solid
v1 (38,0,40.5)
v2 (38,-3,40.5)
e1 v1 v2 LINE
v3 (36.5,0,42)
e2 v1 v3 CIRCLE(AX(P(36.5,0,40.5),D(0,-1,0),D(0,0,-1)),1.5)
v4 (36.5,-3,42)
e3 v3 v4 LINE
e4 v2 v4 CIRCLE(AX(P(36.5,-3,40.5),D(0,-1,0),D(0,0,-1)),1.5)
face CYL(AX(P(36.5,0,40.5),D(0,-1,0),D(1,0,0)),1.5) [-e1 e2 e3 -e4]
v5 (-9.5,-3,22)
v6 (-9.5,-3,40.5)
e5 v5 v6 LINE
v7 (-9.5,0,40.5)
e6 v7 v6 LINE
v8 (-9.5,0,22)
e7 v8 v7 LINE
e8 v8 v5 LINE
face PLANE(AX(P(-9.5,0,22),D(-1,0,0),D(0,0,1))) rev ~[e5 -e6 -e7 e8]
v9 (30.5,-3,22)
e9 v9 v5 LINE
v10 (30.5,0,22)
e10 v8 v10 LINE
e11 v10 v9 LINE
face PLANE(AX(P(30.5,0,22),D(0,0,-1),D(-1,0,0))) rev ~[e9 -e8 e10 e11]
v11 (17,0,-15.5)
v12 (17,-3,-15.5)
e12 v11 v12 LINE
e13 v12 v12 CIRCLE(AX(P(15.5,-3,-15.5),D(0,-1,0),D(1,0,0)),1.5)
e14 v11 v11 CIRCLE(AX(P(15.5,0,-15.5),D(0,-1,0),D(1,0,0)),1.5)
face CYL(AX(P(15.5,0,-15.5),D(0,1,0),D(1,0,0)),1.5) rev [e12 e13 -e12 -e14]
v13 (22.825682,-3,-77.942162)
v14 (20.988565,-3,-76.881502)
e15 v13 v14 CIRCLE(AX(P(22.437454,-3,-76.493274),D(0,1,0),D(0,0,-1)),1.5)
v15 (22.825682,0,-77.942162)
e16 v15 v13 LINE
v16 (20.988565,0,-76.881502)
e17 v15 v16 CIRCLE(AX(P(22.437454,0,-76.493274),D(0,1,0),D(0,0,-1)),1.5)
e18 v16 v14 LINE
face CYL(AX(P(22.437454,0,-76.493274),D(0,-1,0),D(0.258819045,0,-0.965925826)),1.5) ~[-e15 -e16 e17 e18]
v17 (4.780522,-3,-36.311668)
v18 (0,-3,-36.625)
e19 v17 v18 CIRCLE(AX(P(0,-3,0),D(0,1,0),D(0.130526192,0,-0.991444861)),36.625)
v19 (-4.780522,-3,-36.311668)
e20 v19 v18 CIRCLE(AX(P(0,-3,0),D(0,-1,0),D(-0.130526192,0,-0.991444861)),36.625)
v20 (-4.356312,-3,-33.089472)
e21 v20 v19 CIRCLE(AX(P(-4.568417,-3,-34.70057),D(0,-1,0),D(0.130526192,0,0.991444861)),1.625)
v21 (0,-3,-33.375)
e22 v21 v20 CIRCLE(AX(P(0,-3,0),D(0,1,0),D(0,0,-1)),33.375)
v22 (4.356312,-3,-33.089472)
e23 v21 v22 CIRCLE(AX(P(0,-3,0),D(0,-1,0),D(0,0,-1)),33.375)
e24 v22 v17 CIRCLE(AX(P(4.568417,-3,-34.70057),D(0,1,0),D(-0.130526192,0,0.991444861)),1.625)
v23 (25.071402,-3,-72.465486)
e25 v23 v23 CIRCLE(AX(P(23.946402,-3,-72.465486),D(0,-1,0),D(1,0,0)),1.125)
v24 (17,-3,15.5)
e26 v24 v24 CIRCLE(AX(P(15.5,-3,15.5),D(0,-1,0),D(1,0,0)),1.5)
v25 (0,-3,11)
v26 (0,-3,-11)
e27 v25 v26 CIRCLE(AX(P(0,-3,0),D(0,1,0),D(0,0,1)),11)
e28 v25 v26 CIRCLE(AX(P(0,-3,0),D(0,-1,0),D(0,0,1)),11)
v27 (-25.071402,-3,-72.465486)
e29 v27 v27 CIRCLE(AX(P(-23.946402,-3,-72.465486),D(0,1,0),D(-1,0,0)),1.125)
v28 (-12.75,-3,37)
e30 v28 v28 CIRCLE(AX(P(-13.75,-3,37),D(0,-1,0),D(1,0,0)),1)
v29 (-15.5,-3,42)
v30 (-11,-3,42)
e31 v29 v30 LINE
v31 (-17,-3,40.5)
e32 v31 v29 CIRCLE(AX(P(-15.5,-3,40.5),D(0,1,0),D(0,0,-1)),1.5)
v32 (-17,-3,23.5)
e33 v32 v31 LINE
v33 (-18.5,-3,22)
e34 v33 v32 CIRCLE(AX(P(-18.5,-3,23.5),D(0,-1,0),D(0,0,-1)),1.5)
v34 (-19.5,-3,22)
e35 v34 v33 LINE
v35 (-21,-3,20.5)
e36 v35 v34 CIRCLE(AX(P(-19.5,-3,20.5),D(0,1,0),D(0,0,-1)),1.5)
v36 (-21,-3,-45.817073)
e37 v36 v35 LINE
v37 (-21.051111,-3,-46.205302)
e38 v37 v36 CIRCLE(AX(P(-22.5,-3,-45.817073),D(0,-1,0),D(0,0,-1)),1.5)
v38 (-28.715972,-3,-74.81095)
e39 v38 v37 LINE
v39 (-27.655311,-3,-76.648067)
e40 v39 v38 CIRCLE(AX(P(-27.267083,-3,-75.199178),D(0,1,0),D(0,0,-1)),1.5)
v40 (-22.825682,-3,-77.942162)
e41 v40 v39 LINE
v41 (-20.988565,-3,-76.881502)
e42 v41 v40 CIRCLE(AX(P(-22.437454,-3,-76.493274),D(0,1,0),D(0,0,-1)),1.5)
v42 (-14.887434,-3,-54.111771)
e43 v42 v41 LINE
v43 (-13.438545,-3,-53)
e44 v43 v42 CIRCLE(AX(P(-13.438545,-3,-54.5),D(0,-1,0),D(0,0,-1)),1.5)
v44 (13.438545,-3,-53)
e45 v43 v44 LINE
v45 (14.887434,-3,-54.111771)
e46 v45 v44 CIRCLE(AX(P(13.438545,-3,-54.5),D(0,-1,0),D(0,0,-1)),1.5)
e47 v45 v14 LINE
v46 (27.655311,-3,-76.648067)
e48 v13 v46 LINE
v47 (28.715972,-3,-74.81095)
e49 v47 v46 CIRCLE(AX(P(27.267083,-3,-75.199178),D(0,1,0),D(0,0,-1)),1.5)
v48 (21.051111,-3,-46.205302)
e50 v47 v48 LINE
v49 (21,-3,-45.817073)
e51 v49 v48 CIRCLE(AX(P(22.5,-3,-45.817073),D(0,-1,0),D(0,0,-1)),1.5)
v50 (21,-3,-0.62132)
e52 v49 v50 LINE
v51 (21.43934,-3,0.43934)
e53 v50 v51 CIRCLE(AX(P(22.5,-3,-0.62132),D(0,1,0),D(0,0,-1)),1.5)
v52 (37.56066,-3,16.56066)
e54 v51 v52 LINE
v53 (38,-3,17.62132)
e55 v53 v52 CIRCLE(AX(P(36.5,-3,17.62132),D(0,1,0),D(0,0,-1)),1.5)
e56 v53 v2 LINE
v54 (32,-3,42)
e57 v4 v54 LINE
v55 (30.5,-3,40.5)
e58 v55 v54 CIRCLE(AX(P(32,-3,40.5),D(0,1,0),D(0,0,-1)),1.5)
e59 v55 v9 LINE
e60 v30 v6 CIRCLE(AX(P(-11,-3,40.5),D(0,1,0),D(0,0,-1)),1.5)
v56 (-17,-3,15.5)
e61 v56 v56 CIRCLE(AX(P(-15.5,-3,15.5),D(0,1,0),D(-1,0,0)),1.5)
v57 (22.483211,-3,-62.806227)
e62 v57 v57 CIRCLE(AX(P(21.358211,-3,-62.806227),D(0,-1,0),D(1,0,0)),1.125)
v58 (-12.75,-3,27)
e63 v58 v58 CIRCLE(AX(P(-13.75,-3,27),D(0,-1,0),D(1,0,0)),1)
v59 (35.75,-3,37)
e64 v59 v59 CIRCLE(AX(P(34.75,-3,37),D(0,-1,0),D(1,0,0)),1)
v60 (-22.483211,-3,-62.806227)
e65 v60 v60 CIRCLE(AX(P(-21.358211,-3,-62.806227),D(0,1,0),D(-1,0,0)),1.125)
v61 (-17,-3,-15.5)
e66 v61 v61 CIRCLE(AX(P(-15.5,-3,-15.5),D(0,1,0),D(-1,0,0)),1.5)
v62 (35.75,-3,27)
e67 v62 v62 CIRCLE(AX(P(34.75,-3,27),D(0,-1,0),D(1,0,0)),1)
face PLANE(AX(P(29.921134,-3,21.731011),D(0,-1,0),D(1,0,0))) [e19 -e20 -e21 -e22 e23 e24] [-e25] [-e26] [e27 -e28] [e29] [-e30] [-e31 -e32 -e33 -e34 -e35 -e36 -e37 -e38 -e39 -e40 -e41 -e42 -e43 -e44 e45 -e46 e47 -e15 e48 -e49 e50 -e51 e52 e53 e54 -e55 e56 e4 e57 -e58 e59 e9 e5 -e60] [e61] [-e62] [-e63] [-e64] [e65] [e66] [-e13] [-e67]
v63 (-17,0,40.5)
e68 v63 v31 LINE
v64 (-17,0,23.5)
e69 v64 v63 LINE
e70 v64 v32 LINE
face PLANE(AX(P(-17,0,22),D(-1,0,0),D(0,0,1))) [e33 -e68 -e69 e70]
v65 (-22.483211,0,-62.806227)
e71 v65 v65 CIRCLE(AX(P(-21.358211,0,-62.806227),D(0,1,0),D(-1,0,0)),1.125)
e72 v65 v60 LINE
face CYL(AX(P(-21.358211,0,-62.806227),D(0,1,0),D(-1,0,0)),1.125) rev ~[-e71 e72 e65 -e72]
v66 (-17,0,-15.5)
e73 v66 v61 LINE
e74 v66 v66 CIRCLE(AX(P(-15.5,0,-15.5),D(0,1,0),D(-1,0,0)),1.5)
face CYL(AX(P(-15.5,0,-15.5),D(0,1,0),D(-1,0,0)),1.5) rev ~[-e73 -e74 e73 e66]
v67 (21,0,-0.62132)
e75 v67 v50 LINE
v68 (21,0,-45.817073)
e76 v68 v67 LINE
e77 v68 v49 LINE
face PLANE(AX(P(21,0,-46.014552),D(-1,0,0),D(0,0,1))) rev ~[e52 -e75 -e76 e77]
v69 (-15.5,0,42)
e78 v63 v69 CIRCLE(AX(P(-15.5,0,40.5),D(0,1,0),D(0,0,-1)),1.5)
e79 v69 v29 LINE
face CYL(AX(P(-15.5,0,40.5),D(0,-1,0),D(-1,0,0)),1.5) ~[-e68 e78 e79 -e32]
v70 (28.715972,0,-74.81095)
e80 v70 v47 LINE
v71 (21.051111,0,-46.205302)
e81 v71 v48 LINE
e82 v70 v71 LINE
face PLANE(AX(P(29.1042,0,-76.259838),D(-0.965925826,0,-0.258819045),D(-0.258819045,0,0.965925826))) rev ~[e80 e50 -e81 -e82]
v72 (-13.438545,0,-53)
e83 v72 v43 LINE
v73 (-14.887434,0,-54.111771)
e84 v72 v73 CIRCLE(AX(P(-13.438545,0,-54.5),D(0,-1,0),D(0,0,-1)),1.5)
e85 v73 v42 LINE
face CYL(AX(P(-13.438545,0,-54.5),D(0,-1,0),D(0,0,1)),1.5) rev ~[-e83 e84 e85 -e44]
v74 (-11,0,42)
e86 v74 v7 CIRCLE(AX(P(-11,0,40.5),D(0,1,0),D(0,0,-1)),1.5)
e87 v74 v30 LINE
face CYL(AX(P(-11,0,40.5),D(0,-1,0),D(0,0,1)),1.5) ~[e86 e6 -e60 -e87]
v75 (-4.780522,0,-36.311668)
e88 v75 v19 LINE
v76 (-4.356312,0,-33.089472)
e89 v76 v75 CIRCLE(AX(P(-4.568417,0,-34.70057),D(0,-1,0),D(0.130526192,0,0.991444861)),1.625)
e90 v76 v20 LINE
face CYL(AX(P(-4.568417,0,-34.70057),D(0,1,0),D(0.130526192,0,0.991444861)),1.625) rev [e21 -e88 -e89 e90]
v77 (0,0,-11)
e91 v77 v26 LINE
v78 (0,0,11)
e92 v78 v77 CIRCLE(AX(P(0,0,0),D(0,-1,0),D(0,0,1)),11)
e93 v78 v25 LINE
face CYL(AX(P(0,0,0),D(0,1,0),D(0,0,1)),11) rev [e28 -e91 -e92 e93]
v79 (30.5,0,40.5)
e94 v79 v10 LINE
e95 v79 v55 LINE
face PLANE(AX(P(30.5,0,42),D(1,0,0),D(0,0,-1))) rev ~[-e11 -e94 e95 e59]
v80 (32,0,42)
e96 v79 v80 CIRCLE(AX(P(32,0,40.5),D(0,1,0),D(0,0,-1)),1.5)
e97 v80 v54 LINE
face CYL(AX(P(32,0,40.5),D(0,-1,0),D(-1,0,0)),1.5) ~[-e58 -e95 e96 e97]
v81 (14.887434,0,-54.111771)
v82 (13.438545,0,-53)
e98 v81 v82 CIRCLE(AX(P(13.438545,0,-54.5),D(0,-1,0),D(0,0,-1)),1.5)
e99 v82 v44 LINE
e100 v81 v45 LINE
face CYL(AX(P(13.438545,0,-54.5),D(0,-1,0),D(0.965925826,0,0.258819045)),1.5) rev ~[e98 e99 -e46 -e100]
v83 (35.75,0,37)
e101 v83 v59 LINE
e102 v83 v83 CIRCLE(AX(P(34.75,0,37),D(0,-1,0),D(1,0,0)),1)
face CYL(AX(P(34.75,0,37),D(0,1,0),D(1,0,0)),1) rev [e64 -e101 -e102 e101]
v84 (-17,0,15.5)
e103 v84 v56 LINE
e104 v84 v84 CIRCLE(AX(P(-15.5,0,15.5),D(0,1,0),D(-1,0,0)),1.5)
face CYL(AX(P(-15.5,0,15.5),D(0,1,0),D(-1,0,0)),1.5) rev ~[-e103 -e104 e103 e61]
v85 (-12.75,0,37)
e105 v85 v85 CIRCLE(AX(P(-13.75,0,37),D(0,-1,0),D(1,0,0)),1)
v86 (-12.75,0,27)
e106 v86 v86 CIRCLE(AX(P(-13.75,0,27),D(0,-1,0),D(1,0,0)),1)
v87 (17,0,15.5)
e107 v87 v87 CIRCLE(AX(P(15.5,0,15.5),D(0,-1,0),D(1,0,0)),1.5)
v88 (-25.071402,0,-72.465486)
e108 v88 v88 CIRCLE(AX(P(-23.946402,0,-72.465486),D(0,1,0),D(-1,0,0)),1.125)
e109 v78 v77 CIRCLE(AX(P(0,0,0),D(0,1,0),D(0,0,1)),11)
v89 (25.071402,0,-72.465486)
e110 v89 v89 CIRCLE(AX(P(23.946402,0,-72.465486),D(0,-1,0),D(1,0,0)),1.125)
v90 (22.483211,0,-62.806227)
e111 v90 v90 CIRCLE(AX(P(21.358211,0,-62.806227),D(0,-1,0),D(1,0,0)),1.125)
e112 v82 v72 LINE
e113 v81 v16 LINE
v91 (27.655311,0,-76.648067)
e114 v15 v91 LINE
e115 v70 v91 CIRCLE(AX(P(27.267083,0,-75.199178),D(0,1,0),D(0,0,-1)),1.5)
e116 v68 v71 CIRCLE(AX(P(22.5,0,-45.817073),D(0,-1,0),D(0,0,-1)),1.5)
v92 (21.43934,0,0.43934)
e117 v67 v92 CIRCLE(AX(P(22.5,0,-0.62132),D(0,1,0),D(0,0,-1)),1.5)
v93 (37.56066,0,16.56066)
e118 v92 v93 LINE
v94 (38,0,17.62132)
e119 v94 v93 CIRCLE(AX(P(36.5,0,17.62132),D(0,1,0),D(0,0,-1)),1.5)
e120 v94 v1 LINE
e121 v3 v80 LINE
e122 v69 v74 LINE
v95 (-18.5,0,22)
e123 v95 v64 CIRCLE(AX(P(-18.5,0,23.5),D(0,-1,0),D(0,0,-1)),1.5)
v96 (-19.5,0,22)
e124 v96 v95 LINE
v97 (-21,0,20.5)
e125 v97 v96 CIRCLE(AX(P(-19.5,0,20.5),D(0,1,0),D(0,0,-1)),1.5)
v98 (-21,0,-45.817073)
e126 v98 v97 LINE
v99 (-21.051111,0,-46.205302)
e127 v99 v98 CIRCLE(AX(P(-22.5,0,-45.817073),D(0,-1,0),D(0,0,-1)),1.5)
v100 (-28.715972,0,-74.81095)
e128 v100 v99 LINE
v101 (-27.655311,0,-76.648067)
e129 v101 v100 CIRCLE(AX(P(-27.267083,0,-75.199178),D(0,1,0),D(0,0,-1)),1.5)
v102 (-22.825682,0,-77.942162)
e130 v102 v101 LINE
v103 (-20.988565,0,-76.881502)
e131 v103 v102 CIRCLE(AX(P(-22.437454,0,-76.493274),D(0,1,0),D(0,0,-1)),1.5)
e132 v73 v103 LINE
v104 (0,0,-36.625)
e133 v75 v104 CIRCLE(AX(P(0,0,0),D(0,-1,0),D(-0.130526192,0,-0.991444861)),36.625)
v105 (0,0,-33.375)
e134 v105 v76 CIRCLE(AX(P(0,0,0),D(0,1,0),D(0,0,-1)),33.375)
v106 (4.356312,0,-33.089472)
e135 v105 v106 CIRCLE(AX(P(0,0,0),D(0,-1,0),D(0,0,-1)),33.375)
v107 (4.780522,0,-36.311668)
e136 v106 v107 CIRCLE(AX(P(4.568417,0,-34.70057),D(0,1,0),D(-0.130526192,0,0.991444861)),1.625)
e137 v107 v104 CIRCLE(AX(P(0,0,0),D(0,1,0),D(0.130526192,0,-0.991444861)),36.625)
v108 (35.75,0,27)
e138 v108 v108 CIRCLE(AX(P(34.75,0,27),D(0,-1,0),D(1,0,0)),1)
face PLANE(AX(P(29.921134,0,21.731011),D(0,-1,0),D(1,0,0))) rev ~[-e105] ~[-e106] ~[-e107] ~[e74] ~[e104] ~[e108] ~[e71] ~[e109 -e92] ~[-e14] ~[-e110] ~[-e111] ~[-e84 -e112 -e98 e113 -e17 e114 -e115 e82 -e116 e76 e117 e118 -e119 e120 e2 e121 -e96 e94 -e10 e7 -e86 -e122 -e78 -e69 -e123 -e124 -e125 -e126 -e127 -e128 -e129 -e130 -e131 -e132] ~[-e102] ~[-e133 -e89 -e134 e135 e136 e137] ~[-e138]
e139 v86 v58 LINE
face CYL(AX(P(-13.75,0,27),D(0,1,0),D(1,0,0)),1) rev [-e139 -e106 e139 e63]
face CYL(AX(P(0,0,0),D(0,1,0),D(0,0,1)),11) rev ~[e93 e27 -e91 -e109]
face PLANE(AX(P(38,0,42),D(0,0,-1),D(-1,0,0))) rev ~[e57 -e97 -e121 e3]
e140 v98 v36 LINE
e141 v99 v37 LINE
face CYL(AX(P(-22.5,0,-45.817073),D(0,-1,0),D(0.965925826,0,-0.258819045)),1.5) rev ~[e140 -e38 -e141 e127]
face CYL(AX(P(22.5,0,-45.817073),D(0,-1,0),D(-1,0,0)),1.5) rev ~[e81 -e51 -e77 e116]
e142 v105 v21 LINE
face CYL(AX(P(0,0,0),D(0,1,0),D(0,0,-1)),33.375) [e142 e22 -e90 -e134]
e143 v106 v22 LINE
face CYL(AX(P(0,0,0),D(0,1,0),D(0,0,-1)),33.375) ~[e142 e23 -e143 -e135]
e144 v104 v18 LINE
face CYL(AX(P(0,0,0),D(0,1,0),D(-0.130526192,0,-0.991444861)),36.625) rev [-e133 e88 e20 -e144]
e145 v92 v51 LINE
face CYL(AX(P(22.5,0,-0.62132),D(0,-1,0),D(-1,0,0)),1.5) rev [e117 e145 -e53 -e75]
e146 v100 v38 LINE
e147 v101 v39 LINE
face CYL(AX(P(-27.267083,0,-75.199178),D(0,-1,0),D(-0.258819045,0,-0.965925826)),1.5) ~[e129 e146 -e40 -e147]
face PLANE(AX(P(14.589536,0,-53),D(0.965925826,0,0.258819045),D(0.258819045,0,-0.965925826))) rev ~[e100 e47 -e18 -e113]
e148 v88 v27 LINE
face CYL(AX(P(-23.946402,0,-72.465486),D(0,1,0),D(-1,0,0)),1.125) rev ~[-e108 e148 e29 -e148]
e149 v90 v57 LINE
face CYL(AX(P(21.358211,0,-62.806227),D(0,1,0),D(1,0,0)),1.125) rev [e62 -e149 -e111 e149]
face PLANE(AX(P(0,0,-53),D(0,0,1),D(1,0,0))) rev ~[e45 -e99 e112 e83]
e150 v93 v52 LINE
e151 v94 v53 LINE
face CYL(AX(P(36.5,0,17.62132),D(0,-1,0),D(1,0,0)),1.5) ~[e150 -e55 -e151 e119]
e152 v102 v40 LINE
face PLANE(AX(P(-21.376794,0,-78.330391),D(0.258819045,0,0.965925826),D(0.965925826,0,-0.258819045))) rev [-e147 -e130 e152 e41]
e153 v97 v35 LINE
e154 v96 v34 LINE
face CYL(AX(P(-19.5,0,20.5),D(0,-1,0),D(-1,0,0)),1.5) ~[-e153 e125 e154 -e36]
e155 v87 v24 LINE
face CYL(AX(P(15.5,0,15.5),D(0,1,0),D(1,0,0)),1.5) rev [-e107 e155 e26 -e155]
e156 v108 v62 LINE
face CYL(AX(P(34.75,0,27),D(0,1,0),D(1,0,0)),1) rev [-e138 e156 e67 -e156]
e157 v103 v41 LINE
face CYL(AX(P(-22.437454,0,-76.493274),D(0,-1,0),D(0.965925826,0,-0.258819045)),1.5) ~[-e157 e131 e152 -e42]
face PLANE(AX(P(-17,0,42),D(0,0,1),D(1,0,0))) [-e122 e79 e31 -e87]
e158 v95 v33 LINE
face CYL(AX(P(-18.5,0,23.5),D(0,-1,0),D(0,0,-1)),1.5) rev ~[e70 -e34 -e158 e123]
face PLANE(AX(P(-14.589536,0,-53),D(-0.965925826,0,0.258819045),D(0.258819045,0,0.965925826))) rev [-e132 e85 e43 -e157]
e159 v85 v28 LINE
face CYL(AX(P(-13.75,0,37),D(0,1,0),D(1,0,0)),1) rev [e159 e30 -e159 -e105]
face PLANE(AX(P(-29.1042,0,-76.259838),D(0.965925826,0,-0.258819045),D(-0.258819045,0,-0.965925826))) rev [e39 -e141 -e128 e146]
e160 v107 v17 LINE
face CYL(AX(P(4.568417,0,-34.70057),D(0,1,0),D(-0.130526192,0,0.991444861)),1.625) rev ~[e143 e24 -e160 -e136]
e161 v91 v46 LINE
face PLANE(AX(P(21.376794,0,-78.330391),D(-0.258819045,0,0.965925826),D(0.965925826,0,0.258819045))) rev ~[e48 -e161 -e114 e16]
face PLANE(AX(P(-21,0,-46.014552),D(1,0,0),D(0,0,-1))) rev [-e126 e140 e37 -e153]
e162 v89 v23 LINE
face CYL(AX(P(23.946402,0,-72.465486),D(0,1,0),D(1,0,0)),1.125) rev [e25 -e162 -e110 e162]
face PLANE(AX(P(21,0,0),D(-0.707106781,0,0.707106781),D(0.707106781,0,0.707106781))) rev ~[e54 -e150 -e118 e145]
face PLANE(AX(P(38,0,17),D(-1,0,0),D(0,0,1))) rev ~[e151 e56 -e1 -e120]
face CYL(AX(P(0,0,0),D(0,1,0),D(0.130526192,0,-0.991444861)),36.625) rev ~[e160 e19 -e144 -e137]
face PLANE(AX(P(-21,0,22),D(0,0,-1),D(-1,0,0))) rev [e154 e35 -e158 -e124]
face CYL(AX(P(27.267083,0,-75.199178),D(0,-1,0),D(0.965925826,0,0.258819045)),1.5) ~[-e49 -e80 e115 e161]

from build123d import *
from build123d import SkipClean  # not in build123d's __all__

# Parameters (mm, degrees)
F1_R     = 1.125
F1_R_2   = 1.5
F2_DEPTH = 3
F4_R     = 1
F4_W     = 7.5
F4_H     = 20
F5_DEPTH = 3
F6_R     = 1.5


with BuildPart() as f2:
    # F1 (on Front) → F2 (new body)
    with BuildSketch(Plane.XZ):
        with BuildLine():
            Line((0, 22), (0, 11))
            ThreePointArc((0, 11), (11, 0), (0, -11))
            Line((0, -11), (0, -33.375))
            ThreePointArc((0, -33.375), (2.1828294381, -33.3035415631), (4.3563116653, -33.0894722484))
            ThreePointArc((4.3563116653, -33.0894722484), (6.1795146274, -34.4884650857), (4.7805217901, -36.3116680478))
            ThreePointArc((4.7805217901, -36.3116680478), (2.3953896081, -36.5465830636), (0, -36.625))
            Line((0, -36.625), (0, -53))
            Line((0, -53), (14.5895357507, -53))
            Line((14.5895357507, -53), (21.3767935231, -78.330390851))
            Line((21.3767935231, -78.330390851), (29.104200163, -76.2598384823))
            Line((29.104200163, -76.2598384823), (21, -46.0145517191))
            Line((21, -46.0145517191), (21, 22))
            Line((21, 22), (0, 22))
        make_face()
        with Locations((21.3582111666, -62.8062272723)):
            Circle(F1_R, mode=Mode.SUBTRACT)
        with Locations((23.9464016176, -72.4654855352)):
            Circle(F1_R, mode=Mode.SUBTRACT)
        with Locations((15.5, -15.5)):
            Circle(F1_R_2, mode=Mode.SUBTRACT)
        with Locations((15.5, 15.5)):
            Circle(F1_R_2, mode=Mode.SUBTRACT)
    extrude(amount=F2_DEPTH)

    # F3: F2 across face


with BuildPart() as f2_1:
    add(f2.part, clean=False)
    with SkipClean():  # cleaning this boolean's faces spoils the solid; the shape is the same uncleaned
        add(f2.part.mirror(Plane(origin=(0, -1.5, -22.1875), x_dir=(0, -1, 0), z_dir=(-1, 0, 0))), clean=False)

    # F4 (on Front) → F5 (join)
    with BuildSketch(Plane.XZ):
        Polygon((38, 17), (38, 42), (30.5, 42), (30.5, 22), (21, 22), (21, 0), align=None)
        with Locations((34.75, 27)):
            Circle(F4_R, mode=Mode.SUBTRACT)
        with Locations((34.75, 37)):
            Circle(F4_R, mode=Mode.SUBTRACT)
        with Locations((-13.25, 32)):
            Rectangle(F4_W, F4_H)
        with Locations((-13.75, 27)):
            Circle(F4_R, mode=Mode.SUBTRACT)
        with Locations((-13.75, 37)):
            Circle(F4_R, mode=Mode.SUBTRACT)
    extrude(amount=F5_DEPTH)

    # F6
    f6_edges = [f2_1.edges().sort_by_distance(p)[0] for p in [
        (-21, -1.5, 22),
        (-17, -1.5, 42),
        (-9.5, -1.5, 42),
        (30.5, -1.5, 42),
        (38, -1.5, 42),
        (38, -1.5, 17),
        (21, -1.5, 0),
        (21, -1.5, -46.014552),
        (29.1042, -1.5, -76.259838),
        (21.376794, -1.5, -78.330391),
        (-14.589536, -1.5, -53),
        (-21.376794, -1.5, -78.330391),
        (-29.1042, -1.5, -76.259838),
        (14.589536, -1.5, -53),
        (-21, -1.5, -46.014552),
        (-17, -1.5, 22),
    ]]
    fillet(f6_edges, radius=F6_R)


solid = f2_1.part
